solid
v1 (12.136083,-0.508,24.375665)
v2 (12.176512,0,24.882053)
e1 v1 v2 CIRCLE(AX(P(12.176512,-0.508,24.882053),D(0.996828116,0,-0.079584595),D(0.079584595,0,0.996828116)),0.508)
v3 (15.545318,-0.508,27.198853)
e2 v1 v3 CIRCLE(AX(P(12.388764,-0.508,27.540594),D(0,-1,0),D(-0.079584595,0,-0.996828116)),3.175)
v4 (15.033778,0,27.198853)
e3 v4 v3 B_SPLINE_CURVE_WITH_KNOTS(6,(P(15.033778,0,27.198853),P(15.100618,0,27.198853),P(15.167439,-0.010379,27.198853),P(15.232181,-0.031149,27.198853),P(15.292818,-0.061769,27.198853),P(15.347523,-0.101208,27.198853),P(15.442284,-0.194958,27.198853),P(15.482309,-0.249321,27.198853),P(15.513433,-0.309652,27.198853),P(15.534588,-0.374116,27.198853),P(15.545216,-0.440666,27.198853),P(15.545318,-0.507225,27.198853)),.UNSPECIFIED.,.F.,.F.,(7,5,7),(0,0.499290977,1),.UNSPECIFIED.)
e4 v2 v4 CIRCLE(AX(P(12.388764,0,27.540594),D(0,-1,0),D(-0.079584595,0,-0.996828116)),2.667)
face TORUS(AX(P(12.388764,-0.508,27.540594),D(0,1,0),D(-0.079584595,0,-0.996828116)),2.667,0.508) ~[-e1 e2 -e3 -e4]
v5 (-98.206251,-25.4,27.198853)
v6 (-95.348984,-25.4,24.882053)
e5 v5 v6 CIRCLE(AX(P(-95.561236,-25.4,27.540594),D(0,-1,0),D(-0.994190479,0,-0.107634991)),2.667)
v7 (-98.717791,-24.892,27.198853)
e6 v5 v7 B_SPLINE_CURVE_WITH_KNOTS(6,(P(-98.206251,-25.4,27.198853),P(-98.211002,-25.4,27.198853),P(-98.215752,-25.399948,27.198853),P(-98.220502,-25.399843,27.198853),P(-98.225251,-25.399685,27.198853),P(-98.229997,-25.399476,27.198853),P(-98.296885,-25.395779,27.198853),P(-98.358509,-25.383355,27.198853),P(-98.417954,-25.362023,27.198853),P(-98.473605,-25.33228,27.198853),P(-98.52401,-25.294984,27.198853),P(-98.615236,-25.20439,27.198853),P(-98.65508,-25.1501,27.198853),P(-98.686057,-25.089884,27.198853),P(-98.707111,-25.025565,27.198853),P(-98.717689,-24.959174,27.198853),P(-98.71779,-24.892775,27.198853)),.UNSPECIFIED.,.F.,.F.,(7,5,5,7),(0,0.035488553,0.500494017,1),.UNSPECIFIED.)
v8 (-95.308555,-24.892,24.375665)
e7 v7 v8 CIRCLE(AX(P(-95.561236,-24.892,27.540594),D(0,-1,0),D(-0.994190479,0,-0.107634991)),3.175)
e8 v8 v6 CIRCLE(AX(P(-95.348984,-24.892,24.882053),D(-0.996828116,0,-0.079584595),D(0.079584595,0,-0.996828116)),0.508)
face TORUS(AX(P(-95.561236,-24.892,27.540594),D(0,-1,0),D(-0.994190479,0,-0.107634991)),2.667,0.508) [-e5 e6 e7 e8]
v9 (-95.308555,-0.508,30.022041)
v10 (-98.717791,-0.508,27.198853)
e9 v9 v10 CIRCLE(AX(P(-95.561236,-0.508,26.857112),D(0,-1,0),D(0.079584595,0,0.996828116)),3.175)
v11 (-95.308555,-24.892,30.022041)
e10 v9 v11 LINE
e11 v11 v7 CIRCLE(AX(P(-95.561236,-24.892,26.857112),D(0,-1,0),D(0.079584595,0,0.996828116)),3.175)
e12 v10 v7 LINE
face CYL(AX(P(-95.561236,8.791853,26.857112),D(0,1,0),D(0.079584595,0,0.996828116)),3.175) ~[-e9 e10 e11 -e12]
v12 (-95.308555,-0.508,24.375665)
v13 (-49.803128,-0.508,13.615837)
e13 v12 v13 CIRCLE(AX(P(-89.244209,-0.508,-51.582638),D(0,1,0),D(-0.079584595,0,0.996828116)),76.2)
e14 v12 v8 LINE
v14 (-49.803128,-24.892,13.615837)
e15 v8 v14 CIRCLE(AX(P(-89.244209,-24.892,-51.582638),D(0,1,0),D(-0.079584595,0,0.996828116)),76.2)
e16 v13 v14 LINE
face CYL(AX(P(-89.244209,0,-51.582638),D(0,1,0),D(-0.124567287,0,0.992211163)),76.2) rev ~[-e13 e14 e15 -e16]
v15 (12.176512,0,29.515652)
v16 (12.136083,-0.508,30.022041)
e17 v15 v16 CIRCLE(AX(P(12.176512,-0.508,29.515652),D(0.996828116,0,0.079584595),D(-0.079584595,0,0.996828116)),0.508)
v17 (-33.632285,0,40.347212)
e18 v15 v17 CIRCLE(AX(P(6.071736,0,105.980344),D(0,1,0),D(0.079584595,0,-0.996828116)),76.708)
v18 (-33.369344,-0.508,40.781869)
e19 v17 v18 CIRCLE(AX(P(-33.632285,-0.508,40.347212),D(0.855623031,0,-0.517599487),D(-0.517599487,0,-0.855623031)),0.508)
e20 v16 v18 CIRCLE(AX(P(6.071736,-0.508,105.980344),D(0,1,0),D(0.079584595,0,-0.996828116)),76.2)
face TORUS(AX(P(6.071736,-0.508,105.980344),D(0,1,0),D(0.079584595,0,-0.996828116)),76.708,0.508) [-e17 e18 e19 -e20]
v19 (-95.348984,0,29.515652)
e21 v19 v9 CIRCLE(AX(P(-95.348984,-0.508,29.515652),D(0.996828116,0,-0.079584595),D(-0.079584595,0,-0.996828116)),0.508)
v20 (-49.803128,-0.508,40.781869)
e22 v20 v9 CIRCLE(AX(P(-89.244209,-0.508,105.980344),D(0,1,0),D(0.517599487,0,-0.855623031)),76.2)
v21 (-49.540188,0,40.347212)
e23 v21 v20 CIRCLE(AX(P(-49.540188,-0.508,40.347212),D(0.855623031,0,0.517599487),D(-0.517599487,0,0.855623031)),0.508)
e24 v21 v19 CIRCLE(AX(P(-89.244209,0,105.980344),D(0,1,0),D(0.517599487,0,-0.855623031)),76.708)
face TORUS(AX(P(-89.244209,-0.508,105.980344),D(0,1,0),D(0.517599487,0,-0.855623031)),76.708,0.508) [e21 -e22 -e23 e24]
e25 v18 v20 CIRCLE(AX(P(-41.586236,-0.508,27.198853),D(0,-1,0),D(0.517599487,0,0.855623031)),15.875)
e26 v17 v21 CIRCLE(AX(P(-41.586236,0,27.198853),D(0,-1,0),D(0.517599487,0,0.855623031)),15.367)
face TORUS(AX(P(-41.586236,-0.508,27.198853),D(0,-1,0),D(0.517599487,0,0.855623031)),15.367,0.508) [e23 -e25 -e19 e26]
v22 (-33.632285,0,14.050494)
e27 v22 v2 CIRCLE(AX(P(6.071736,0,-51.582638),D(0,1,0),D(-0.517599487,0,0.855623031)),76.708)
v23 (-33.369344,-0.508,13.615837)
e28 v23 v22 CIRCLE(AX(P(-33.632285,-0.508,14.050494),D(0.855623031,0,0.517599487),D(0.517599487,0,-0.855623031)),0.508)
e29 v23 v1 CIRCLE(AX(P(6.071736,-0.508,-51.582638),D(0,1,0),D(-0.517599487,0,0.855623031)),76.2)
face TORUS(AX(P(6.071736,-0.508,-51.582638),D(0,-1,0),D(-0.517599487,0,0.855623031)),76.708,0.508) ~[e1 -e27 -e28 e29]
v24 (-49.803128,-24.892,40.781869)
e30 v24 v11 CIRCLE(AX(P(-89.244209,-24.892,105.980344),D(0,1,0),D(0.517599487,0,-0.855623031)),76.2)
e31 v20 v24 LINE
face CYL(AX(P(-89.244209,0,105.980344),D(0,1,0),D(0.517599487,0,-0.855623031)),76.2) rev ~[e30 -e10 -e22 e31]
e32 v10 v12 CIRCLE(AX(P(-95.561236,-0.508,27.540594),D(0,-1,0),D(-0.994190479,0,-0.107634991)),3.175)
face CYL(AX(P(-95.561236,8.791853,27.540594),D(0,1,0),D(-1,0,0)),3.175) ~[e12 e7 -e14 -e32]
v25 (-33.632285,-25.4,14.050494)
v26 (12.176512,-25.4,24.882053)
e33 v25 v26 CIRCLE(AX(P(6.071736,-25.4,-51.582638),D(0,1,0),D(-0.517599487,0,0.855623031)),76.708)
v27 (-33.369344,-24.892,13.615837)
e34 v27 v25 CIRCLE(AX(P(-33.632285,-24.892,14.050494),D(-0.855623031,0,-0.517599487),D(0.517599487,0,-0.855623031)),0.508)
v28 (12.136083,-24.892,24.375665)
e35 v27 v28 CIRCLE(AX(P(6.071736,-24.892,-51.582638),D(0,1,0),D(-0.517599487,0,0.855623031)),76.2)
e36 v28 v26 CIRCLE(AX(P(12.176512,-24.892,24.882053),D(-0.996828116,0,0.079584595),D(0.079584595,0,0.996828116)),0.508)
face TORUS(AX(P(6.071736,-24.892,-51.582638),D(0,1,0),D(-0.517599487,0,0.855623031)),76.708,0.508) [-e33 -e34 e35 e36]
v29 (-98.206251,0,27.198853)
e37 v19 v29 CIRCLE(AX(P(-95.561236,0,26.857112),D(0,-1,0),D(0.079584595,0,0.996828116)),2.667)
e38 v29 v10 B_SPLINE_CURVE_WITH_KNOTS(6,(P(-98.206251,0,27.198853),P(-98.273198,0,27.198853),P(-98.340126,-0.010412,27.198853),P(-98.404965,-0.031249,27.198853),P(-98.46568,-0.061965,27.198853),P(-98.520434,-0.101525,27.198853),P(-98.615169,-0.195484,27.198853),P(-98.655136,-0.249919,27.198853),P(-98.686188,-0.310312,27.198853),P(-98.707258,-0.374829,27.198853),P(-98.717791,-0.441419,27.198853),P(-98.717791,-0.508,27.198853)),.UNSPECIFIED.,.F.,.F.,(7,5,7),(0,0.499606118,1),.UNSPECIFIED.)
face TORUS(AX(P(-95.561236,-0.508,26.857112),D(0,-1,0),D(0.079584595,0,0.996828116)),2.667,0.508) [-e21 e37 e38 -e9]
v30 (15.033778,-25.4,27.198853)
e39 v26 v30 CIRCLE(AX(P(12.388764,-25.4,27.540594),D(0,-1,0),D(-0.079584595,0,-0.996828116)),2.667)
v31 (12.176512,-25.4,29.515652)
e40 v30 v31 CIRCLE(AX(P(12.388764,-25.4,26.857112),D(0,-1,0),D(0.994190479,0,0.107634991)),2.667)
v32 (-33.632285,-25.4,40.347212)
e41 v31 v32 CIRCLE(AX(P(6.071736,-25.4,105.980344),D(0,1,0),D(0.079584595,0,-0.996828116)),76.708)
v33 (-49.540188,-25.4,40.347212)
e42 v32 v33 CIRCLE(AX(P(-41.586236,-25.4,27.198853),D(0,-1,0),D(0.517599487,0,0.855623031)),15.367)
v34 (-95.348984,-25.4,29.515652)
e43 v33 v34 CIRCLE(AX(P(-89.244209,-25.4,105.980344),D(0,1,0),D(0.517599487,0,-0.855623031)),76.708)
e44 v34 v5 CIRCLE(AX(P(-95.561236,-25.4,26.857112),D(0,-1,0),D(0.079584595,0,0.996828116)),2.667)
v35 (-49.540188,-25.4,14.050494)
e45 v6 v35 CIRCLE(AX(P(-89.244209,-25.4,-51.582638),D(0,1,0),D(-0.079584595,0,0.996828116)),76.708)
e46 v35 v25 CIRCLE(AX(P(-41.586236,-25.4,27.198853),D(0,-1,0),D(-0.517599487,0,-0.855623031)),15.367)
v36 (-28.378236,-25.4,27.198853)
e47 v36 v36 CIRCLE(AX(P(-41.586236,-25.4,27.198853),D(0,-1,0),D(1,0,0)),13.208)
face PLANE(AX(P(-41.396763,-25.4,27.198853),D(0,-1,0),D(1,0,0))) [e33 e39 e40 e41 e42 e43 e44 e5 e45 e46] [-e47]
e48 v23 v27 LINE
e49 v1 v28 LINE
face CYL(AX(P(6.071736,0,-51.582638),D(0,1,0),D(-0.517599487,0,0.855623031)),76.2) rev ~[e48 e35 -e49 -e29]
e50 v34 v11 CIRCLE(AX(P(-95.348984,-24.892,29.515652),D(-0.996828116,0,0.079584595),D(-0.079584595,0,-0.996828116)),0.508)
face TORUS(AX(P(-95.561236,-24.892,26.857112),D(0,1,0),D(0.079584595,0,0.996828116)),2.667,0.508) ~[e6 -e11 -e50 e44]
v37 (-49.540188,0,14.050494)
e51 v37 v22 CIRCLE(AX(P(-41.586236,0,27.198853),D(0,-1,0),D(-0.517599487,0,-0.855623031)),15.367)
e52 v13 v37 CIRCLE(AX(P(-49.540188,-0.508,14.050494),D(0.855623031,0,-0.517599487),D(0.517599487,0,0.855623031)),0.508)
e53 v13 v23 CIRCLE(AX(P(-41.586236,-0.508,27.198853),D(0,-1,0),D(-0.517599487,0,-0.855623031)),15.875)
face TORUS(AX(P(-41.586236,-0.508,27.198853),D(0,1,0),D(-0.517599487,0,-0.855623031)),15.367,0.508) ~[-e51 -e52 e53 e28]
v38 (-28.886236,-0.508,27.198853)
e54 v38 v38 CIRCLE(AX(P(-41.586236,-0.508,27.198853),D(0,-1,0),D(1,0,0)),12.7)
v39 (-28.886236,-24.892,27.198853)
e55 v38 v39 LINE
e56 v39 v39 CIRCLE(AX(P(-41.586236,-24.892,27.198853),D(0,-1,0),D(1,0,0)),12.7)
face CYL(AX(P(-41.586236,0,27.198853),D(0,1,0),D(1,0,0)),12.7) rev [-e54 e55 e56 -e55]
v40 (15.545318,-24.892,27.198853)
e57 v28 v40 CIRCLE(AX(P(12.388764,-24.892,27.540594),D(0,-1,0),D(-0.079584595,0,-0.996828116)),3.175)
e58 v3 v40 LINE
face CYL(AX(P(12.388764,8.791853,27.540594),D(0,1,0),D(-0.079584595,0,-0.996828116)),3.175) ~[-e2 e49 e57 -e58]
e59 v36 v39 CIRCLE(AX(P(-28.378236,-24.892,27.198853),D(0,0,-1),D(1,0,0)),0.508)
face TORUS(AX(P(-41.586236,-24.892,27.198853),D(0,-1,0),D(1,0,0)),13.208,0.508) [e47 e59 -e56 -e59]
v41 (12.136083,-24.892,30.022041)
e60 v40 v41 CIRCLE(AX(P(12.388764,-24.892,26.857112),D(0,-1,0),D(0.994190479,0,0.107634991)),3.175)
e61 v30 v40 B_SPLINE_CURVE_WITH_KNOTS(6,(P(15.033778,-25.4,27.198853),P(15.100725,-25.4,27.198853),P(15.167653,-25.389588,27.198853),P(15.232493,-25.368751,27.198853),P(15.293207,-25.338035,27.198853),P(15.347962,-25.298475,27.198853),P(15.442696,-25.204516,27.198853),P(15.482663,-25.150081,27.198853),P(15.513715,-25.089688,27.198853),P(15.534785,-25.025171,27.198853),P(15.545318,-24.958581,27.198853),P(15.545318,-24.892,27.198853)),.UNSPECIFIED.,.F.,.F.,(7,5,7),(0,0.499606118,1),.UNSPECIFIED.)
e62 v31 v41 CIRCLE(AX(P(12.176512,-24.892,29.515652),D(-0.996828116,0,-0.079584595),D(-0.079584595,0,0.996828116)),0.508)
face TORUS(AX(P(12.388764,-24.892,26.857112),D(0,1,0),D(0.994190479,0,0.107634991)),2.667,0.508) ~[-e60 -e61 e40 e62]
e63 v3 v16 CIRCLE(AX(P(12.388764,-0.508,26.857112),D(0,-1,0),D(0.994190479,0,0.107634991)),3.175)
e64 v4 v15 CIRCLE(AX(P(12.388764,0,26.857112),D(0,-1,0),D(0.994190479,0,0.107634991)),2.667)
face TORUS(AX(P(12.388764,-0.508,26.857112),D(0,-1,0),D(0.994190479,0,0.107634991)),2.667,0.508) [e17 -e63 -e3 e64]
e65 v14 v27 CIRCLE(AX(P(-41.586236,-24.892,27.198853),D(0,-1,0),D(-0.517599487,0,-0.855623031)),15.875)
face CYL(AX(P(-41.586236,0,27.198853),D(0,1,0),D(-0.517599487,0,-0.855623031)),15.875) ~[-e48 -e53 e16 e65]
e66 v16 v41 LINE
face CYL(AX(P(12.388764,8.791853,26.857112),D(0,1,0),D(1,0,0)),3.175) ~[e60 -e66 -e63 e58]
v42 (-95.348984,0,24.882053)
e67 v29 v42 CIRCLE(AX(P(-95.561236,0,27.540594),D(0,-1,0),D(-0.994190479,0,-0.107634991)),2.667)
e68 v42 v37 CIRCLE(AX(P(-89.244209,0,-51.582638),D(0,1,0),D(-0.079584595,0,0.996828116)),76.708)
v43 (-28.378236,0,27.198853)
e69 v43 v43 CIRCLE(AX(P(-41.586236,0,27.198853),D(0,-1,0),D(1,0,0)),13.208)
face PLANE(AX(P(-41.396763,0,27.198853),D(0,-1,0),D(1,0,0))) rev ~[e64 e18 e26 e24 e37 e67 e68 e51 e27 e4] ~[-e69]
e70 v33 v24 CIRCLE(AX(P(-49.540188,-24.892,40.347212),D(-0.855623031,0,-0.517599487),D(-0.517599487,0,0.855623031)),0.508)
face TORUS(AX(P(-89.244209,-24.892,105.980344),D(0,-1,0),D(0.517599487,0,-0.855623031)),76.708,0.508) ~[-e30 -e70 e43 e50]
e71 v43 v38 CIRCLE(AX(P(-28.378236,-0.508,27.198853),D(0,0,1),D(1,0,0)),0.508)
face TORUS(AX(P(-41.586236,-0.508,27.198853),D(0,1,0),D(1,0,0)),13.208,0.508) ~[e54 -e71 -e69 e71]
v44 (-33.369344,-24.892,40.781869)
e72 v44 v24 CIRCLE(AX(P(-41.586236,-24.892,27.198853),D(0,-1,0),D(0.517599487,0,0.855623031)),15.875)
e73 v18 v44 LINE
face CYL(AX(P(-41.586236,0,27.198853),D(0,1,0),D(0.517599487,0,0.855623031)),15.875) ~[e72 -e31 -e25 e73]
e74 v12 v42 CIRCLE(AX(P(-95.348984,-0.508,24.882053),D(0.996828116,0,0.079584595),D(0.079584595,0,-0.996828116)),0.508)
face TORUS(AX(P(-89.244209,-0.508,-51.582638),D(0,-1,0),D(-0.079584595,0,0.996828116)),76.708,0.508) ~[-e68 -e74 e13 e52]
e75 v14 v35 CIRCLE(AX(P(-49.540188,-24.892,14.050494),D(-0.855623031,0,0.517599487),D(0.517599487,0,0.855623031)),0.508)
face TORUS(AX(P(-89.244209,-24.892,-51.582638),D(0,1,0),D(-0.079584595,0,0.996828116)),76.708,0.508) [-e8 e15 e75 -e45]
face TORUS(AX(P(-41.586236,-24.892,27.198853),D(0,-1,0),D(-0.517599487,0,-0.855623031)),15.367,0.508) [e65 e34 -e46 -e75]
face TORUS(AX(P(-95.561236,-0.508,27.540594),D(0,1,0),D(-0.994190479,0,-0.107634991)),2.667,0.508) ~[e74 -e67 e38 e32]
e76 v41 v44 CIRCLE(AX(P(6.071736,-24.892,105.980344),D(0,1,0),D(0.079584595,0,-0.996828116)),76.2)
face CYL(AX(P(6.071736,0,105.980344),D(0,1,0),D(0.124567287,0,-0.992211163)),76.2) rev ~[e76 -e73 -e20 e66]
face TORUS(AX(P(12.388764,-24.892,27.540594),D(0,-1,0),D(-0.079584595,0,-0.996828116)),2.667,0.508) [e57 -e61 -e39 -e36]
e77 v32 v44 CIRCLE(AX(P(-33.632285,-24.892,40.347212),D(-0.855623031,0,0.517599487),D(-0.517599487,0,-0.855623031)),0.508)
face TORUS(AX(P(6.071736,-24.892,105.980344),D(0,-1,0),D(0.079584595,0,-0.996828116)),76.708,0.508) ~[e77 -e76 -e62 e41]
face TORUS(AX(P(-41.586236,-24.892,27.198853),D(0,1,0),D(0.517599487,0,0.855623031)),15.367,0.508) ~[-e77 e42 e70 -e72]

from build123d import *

# Parameters (mm, degrees)
F0_R        = 12.7
F1_DEPTH    = 25.4
F2_T1_DEPTH = 42.98370548
F3_R        = 0.508


# Not quite as in the source:
# - a fillet or chamfer that OpenCascade refuses, or shapes differently, is made with other operations: its cross-section is extruded or revolved along the edge and cut away or added


with BuildPart() as f1:
    # F0 (on Front) → F1 (new body)
    with BuildSketch(Plane.XZ):
        with BuildLine():
            ThreePointArc((-33.3693444663, 13.6158373531), (-27.7576647521, 19.4023003087), (-25.711236319, 27.1988529712))
            ThreePointArc((-25.711236319, 27.1988529712), (-27.7576647521, 34.9954056337), (-33.3693444663, 40.7818685893))
            ThreePointArc((-33.3693444663, 40.7818685893), (-41.586236319, 43.0738529712), (-49.8031281716, 40.7818685893))
            ThreePointArc((-49.8031281716, 40.7818685893), (-57.461236319, 27.1988529712), (-49.8031281716, 13.6158373531))
            ThreePointArc((-49.8031281716, 13.6158373531), (-41.586236319, 11.3238529712), (-33.3693444663, 13.6158373531))
        make_face()
        with Locations((-41.586236319, 27.1988529712)):
            Circle(F0_R, mode=Mode.SUBTRACT)
        with BuildLine():
            ThreePointArc((-33.3693444663, 40.7818685893), (-27.7576647521, 34.9954056337), (-25.711236319, 27.1988529712))
            ThreePointArc((-25.711236319, 27.1988529712), (-27.7576647521, 19.4023003087), (-33.3693444663, 13.6158373531))
            ThreePointArc((-33.3693444663, 13.6158373531), (-9.7812806597, 22.9500521891), (15.563763681, 24.0238529712))
            Line((15.563763681, 24.0238529712), (15.563763681, 27.1988529712))
            Line((15.563763681, 27.1988529712), (15.563763681, 30.3738529712))
            ThreePointArc((15.563763681, 30.3738529712), (-9.7812806597, 31.4476537533), (-33.3693444663, 40.7818685893))
        make_face()
        with BuildLine():
            ThreePointArc((-49.8031281716, 13.6158373531), (-57.461236319, 27.1988529712), (-49.8031281716, 40.7818685893))
            ThreePointArc((-49.8031281716, 40.7818685893), (-73.3911919783, 31.4476537533), (-98.736236319, 30.3738529712))
            Line((-98.736236319, 30.3738529712), (-98.736236319, 27.1988529712))
            Line((-98.736236319, 27.1988529712), (-98.736236319, 24.0238529712))
            ThreePointArc((-98.736236319, 24.0238529712), (-73.3911919783, 22.9500521891), (-49.8031281716, 13.6158373531))
        make_face()
    extrude(amount=F1_DEPTH)

    # F2: fillet of radius 3.175 on 4 edges, made by hand

    # F2_s2 → F2_t1 (cut)
    with BuildSketch(Plane.XZ.offset(-8.79185274)):
        with BuildLine():
            ThreePointArc((15.563763681, 26.8571118752), (14.5426395524, 29.1898021098), (12.1360825908, 30.0220411424))
            ThreePointArc((12.1360825908, 30.0220411424), (13.8519119629, 30.1785700373), (15.563763681, 30.3738529712))
            Line((15.563763681, 30.3738529712), (15.563763681, 26.8571118752))
        make_face()
        with BuildLine():
            ThreePointArc((12.1360825908, 24.3756648), (14.5426395524, 25.2079038326), (15.563763681, 27.5405940672))
            Line((15.563763681, 27.5405940672), (15.563763681, 24.0238529712))
            ThreePointArc((15.563763681, 24.0238529712), (13.8519119629, 24.219135905), (12.1360825908, 24.3756648))
        make_face()
        with BuildLine():
            ThreePointArc((-95.3085552288, 30.0220411424), (-97.7151121904, 29.1898021098), (-98.736236319, 26.8571118752))
            Line((-98.736236319, 26.8571118752), (-98.736236319, 30.3738529712))
            ThreePointArc((-98.736236319, 30.3738529712), (-97.0243846009, 30.1785700373), (-95.3085552288, 30.0220411424))
        make_face()
        with BuildLine():
            ThreePointArc((-98.736236319, 27.5405940672), (-97.7151121904, 25.2079038326), (-95.3085552288, 24.3756648))
            ThreePointArc((-95.3085552288, 24.3756648), (-97.0243846009, 24.219135905), (-98.736236319, 24.0238529712))
            Line((-98.736236319, 24.0238529712), (-98.736236319, 27.5405940672))
        make_face()
    extrude(amount=F2_T1_DEPTH, mode=Mode.SUBTRACT)

    # F3
    f3_edges = [f1.edges().sort_by_distance(p)[0] for p in [
        (-71.710097, -25.4, 31.825135),
        (-11.462375, 0, 31.825135),
        (-11.462375, -25.4, 22.572571),
        (-11.462375, 0, 22.572571),
        (-54.286236, -25.4, 27.198853),
        (-54.286236, 0, 27.198853),
    ]]
    fillet(f3_edges, radius=F3_R)


solid = f1.part
